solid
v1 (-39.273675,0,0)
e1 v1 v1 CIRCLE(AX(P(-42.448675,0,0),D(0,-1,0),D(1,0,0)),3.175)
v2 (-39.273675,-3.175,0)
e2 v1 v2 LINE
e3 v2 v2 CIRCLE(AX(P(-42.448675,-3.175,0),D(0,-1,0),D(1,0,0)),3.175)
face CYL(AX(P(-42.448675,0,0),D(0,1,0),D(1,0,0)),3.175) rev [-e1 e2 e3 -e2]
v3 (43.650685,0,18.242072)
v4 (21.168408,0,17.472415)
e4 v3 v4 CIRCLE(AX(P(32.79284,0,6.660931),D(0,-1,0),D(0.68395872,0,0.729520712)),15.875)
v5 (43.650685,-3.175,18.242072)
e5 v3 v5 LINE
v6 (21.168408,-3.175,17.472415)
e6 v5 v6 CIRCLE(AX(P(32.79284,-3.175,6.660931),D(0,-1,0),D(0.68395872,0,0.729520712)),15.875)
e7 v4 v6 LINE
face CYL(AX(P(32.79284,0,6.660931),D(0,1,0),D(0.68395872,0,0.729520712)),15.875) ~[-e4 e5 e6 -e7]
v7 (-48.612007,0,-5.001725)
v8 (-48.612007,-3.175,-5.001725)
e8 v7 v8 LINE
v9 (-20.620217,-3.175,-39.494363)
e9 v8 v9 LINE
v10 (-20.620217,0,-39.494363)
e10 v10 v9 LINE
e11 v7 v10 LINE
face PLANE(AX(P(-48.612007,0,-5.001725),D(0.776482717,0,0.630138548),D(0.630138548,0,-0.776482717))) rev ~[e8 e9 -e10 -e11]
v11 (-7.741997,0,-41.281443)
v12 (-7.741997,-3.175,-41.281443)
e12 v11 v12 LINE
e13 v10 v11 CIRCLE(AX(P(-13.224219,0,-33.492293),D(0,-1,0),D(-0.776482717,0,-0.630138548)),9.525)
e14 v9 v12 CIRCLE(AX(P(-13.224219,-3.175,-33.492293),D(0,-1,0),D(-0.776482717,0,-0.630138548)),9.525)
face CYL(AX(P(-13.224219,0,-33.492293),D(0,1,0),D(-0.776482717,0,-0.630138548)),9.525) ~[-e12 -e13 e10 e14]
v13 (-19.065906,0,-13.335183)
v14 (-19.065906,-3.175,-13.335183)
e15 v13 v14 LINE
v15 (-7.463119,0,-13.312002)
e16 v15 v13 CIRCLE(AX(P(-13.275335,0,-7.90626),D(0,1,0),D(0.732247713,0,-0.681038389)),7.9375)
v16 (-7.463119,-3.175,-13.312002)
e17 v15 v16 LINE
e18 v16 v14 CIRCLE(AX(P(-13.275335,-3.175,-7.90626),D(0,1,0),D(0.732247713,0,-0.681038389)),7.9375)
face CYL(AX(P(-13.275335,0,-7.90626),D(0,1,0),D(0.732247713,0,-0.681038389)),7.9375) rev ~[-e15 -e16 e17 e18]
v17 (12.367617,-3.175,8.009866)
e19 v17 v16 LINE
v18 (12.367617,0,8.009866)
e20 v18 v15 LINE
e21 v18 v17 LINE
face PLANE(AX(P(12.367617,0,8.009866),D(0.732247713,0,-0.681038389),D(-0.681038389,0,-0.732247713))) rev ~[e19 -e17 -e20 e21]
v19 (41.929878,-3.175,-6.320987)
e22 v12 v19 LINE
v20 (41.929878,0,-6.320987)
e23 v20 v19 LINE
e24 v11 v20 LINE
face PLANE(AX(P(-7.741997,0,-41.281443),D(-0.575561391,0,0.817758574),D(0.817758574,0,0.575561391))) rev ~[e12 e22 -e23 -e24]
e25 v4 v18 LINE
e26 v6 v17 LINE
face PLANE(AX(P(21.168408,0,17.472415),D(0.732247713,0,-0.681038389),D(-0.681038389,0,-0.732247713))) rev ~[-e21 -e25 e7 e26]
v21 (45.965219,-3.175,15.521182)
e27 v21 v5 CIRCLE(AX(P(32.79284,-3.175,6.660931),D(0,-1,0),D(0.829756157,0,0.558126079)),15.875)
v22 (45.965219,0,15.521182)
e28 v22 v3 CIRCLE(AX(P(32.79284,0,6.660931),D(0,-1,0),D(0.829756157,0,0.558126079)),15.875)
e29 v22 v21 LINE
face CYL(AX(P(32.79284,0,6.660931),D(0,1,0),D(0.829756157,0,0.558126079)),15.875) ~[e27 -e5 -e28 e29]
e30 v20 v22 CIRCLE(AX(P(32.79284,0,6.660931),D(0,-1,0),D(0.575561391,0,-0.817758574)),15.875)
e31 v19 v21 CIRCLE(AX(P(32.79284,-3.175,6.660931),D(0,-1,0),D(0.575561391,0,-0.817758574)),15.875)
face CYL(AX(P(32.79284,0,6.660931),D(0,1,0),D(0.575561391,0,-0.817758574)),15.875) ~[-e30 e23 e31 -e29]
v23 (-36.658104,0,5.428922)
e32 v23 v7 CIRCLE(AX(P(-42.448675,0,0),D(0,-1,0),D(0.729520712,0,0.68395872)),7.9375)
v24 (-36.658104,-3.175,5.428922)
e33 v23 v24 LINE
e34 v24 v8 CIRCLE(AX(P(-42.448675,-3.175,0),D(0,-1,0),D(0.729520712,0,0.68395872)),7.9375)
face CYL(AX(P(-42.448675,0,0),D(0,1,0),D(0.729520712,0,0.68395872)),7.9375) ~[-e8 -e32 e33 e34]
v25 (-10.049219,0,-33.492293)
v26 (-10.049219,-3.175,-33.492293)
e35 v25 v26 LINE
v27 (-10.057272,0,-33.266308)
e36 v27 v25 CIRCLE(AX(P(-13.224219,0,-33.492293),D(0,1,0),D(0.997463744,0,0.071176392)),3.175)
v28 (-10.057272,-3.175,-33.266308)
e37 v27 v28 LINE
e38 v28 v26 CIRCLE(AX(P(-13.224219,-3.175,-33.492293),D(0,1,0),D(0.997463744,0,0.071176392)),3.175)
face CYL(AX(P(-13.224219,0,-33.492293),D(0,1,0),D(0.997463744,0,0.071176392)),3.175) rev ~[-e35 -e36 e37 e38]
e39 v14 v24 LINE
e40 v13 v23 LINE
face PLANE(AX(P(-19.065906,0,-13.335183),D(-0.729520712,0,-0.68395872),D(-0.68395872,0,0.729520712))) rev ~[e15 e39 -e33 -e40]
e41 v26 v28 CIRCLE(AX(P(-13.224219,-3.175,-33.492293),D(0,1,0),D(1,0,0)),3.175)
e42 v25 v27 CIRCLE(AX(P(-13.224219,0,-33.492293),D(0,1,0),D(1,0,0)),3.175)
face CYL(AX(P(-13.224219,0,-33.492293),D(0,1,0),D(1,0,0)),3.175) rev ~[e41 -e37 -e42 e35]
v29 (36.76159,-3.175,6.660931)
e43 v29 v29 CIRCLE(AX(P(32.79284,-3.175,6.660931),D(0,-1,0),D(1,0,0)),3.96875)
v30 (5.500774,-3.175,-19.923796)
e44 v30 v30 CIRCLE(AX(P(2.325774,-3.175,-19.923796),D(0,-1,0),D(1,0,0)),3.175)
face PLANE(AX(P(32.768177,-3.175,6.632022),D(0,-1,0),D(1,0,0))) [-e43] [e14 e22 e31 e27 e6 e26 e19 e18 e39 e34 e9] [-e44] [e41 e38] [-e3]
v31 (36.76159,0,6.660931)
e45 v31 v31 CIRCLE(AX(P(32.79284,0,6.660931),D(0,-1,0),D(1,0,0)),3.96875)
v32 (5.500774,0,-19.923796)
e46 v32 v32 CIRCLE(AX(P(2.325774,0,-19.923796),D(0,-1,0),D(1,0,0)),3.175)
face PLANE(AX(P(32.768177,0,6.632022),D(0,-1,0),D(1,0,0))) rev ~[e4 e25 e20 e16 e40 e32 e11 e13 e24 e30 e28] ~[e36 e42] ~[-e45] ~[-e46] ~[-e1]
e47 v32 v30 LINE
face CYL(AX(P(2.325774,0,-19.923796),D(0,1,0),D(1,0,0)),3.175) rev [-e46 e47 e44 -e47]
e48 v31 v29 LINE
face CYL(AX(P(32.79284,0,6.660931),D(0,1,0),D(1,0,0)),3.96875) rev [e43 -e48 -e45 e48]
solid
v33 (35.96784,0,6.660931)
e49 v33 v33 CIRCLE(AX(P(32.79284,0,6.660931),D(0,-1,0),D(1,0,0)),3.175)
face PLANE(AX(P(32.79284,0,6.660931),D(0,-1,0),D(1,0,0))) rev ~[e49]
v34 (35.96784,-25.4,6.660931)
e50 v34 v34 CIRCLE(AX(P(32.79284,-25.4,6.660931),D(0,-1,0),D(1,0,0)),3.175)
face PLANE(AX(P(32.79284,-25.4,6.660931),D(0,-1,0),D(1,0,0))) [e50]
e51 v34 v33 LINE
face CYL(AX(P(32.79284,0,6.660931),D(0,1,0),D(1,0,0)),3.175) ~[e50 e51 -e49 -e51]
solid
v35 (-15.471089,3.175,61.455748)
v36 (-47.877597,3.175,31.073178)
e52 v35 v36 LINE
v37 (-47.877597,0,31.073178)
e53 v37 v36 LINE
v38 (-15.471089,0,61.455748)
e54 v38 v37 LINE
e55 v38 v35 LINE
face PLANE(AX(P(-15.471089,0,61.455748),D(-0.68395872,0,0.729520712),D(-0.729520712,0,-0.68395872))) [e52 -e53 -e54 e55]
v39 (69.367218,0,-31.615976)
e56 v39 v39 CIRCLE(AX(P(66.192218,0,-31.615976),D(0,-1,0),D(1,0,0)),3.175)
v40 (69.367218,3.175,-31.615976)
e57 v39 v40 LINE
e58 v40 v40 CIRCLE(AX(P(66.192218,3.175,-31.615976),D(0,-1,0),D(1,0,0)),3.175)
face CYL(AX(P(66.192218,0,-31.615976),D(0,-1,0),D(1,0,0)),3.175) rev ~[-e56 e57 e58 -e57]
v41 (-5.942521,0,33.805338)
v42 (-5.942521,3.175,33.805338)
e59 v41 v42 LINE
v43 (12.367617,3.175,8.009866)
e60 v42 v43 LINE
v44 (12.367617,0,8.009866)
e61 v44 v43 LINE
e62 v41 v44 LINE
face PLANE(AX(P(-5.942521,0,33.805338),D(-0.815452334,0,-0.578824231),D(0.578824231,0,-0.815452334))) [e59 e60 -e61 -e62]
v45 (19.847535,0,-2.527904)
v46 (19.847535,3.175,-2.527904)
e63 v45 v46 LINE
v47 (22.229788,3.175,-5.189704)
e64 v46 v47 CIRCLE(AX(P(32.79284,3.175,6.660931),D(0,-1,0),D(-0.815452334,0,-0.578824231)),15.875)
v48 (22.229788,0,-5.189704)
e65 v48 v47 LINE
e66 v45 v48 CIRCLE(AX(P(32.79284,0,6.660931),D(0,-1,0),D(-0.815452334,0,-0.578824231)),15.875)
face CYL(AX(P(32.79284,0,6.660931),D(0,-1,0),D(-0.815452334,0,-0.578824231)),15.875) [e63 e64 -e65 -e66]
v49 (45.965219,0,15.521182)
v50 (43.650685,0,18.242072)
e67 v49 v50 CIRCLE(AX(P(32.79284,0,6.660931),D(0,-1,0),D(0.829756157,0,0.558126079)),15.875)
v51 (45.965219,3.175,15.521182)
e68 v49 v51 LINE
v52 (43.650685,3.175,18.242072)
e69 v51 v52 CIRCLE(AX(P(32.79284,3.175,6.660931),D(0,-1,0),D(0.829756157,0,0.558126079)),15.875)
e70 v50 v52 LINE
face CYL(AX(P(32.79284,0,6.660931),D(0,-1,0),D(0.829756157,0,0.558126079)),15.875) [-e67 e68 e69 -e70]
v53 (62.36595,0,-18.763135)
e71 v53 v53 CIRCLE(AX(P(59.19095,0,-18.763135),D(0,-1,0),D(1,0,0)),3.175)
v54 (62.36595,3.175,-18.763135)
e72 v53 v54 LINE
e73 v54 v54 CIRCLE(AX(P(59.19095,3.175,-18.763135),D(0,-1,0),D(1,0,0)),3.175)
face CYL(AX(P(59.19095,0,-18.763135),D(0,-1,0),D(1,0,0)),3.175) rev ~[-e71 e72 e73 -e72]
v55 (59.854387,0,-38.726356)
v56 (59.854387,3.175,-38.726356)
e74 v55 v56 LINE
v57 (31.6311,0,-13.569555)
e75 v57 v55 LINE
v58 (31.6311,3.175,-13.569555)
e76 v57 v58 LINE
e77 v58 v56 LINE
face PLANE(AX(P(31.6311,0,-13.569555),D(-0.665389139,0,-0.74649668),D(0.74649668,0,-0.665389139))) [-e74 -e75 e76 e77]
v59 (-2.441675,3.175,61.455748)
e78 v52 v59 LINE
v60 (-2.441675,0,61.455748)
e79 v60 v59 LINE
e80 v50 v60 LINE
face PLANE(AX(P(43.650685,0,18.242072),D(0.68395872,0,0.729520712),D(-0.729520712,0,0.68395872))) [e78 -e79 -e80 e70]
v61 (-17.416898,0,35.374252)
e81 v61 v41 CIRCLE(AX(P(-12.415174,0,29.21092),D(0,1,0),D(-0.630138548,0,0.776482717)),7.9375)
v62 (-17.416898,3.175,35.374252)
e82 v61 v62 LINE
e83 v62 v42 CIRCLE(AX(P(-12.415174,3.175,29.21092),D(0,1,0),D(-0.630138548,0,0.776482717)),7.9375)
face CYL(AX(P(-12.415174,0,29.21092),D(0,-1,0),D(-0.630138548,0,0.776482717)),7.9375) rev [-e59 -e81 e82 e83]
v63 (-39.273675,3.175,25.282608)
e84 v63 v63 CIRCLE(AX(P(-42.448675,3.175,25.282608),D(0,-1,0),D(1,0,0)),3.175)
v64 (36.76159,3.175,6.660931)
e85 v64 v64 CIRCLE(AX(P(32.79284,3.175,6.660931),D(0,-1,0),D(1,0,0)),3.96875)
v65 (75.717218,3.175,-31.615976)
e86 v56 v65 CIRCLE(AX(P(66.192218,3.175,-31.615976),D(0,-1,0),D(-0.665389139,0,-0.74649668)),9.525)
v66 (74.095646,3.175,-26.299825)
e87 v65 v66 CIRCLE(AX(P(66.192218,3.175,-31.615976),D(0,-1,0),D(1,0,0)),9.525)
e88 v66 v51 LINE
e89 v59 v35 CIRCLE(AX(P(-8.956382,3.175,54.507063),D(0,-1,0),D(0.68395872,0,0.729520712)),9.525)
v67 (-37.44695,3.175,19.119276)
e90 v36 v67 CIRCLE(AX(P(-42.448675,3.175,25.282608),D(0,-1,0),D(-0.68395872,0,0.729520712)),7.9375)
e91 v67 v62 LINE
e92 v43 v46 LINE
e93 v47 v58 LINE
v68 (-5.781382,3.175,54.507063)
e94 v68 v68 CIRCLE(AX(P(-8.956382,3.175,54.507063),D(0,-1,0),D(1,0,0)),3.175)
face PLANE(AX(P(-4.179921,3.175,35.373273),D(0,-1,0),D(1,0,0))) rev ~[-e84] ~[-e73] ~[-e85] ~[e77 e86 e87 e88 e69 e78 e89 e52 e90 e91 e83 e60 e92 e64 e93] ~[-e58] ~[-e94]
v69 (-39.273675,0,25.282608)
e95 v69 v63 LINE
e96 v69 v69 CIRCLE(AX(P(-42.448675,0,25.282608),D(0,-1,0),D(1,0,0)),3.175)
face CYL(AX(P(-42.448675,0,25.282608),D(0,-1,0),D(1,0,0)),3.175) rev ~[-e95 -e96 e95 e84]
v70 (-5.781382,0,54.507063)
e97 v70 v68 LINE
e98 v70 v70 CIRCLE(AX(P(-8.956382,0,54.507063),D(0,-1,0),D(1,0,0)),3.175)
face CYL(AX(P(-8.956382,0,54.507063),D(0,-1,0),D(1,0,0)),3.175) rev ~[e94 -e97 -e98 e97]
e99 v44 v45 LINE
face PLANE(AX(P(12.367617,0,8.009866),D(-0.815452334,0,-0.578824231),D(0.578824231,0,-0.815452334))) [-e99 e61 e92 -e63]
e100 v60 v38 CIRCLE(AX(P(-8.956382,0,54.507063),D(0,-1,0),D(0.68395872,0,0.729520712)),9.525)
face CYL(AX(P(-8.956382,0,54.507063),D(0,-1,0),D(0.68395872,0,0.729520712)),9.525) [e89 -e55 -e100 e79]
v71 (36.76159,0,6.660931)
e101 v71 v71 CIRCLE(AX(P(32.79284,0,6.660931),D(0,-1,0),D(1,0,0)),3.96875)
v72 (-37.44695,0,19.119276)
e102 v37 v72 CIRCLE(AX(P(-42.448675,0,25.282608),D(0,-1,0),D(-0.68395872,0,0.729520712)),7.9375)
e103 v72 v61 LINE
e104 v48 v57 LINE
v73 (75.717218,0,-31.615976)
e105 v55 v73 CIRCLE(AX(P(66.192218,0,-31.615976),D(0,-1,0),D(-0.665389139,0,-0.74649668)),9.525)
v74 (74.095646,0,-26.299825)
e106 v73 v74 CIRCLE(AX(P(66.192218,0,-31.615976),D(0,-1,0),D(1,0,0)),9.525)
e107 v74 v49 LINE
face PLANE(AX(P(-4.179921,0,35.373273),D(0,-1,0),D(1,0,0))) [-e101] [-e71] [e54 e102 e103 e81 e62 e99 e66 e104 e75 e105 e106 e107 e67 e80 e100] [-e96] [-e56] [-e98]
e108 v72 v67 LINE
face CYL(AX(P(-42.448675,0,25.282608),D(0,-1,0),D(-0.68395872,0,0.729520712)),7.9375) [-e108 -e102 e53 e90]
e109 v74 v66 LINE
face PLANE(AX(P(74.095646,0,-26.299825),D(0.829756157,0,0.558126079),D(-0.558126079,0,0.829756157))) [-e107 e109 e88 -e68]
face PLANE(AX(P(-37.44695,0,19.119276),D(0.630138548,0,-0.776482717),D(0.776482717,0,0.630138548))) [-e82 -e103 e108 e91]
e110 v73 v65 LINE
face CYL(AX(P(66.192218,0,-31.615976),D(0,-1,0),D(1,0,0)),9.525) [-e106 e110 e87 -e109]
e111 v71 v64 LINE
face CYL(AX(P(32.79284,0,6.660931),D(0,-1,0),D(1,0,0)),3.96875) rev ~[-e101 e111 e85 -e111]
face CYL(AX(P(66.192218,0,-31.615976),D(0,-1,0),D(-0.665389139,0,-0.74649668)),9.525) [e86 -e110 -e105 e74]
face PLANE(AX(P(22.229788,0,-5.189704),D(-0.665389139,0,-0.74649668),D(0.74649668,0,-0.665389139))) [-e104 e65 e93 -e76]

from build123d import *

# Parameters (mm, degrees)
F0_R     = 3.175
F0_R_2   = 3.96875
F1_DEPTH = 3.175
F2_DEPTH = 3.175
F3_DEPTH = 25.4


# Not quite as in the source:
# - a feature names something its author has since deleted; it is built from what else it names


with BuildPart() as f1:
    # F0 (on Front) → F1 (new body)
    with BuildSketch(Plane.XZ):
        with BuildLine():
            ThreePointArc((21.168407994, 17.4724150988), (32.2496948497, 22.5266363925), (43.6506851161, 18.2420719796))
            Line((43.6506851161, 18.2420719796), (-2.4416753004, 61.4557481855))
            ThreePointArc((-2.4416753004, 61.4557481855), (-0.2162960867, 58.2934233078), (0.5686178911, 54.5070634035))
            ThreePointArc((0.5686178911, 54.5070634035), (-12.7427420132, 45.7669773813), (-15.4710889174, 61.4557481855))
            Line((-15.4710889174, 61.4557481855), (-47.8775973584, 31.0731782742))
            ThreePointArc((-47.8775973584, 31.0731782742), (-39.2933750978, 32.5660126411), (-34.511175018, 25.2826076226))
            ThreePointArc((-34.511175018, 25.2826076226), (-35.2826057932, 21.8691990453), (-37.4469502912, 19.1192760553))
            Line((-37.4469502912, 19.1192760553), (-17.4168982381, 35.3742520435))
            ThreePointArc((-17.4168982381, 35.3742520435), (-11.3398687202, 37.0752466303), (-5.9425206073, 33.8053378098))
            Line((-5.9425206073, 33.8053378098), (12.3676167081, 8.0098658563))
            Line((12.3676167081, 8.0098658563), (21.168407994, 17.4724150988))
        make_face()
        with BuildLine():
            ThreePointArc((0.5686178911, 54.5070634035), (-0.2162960867, 58.2934233078), (-2.4416753004, 61.4557481855))
            ThreePointArc((-2.4416753004, 61.4557481855), (-8.9563821089, 64.0320634035), (-15.4710889174, 61.4557481855))
            ThreePointArc((-15.4710889174, 61.4557481855), (-12.7427420132, 45.7669773813), (0.5686178911, 54.5070634035))
        make_face()
        with Locations((-8.9563821089, 54.5070634035)):
            Circle(F0_R, mode=Mode.SUBTRACT)
        with BuildLine():
            ThreePointArc((-34.511175018, 25.2826076226), (-39.2933750978, 32.5660126411), (-47.8775973584, 31.0731782742))
            ThreePointArc((-47.8775973584, 31.0731782742), (-48.4294416089, 20.0639548045), (-37.4469502912, 19.1192760553))
            ThreePointArc((-37.4469502912, 19.1192760553), (-35.2826057932, 21.8691990453), (-34.511175018, 25.2826076226))
        make_face()
        with Locations((-42.448675018, 25.2826076226)):
            Circle(F0_R, mode=Mode.SUBTRACT)
        with BuildLine():
            ThreePointArc((48.6678404353, 6.6609306763), (47.9771603326, 11.292566916), (45.9652194266, 15.52118218))
            ThreePointArc((45.9652194266, 15.52118218), (44.8847270854, 16.9469358407), (43.6506851161, 18.2420719796))
            ThreePointArc((43.6506851161, 18.2420719796), (32.2496948497, 22.5266363925), (21.168407994, 17.4724150988))
            ThreePointArc((21.168407994, 17.4724150988), (16.9523480083, 7.7070782137), (19.8475346273, -2.5279039906))
            ThreePointArc((19.8475346273, -2.5279039906), (20.9635537477, -3.926023629), (22.229787853, -5.1897041229))
            ThreePointArc((22.229787853, -5.1897041229), (31.8827140076, -9.1879587134), (41.9298775136, -6.3209866871))
            ThreePointArc((41.9298775136, -6.3209866871), (46.8830158887, -0.6522478865), (48.6678404353, 6.6609306763))
        make_face()
        with Locations((32.7928404353, 6.6609306763)):
            Circle(F0_R_2, mode=Mode.SUBTRACT)
        with BuildLine():
            ThreePointArc((59.8543869213, -38.726356385), (59.9298350891, -24.4390555964), (74.0956458655, -26.2998246032))
            Line((74.0956458655, -26.2998246032), (45.9652194266, 15.52118218))
            ThreePointArc((45.9652194266, 15.52118218), (47.9771603326, 11.292566916), (48.6678404353, 6.6609306763))
            ThreePointArc((48.6678404353, 6.6609306763), (46.8830158887, -0.6522478865), (41.9298775136, -6.3209866871))
            Line((41.9298775136, -6.3209866871), (31.63109975, -13.5695549573))
            Line((31.63109975, -13.5695549573), (59.8543869213, -38.726356385))
        make_face()
        with Locations((59.1909500346, -18.7631345147)):
            Circle(F0_R, mode=Mode.SUBTRACT)
        with BuildLine():
            Line((22.229787853, -5.1897041229), (31.63109975, -13.5695549573))
            Line((31.63109975, -13.5695549573), (41.9298775136, -6.3209866871))
            ThreePointArc((41.9298775136, -6.3209866871), (31.8827140076, -9.1879587134), (22.229787853, -5.1897041229))
        make_face()
        with BuildLine():
            ThreePointArc((19.8475346273, -2.5279039906), (16.9523480083, 7.7070782137), (21.168407994, 17.4724150988))
            Line((21.168407994, 17.4724150988), (12.3676167081, 8.0098658563))
            Line((12.3676167081, 8.0098658563), (19.8475346273, -2.5279039906))
        make_face()
        with BuildLine():
            ThreePointArc((59.8543869213, -38.726356385), (70.088227935, -40.3077379996), (75.7172184707, -31.6159755055))
            ThreePointArc((75.7172184707, -31.6159755055), (75.3028104091, -28.8369937617), (74.0956458655, -26.2998246032))
            ThreePointArc((74.0956458655, -26.2998246032), (59.9298350891, -24.4390555964), (59.8543869213, -38.726356385))
        make_face()
        with Locations((66.1922184707, -31.6159755055)):
            Circle(F0_R, mode=Mode.SUBTRACT)
    extrude(amount=-F1_DEPTH)


with BuildPart() as f2:
    # F0 (on Front) → F2 (new body)
    with BuildSketch(Plane.XZ):
        with Locations((32.7928404353, 6.6609306763)):
            Circle(F0_R)
    extrude(amount=F2_DEPTH)

    # F0 (on Front) → F3 (join)
    with BuildSketch(Plane.XZ):
        with Locations((32.7928404353, 6.6609306763)):
            Circle(F0_R)
    extrude(amount=F3_DEPTH)


with BuildPart() as f2b:
    # F0 (on Front) → F2, piece 2 (new body)
    with BuildSketch(Plane.XZ):
        with BuildLine():
            ThreePointArc((48.6678404353, 6.6609306763), (47.9771603326, 11.292566916), (45.9652194266, 15.52118218))
            ThreePointArc((45.9652194266, 15.52118218), (44.8847270854, 16.9469358407), (43.6506851161, 18.2420719796))
            ThreePointArc((43.6506851161, 18.2420719796), (32.2496948497, 22.5266363925), (21.168407994, 17.4724150988))
            ThreePointArc((21.168407994, 17.4724150988), (16.9523480083, 7.7070782137), (19.8475346273, -2.5279039906))
            ThreePointArc((19.8475346273, -2.5279039906), (20.9635537477, -3.926023629), (22.229787853, -5.1897041229))
            ThreePointArc((22.229787853, -5.1897041229), (31.8827140076, -9.1879587134), (41.9298775136, -6.3209866871))
            ThreePointArc((41.9298775136, -6.3209866871), (46.8830158887, -0.6522478865), (48.6678404353, 6.6609306763))
        make_face()
        with Locations((32.7928404353, 6.6609306763)):
            Circle(F0_R_2, mode=Mode.SUBTRACT)
        with BuildLine():
            Line((-7.7419969901, -41.2814433271), (31.63109975, -13.5695549573))
            Line((31.63109975, -13.5695549573), (22.229787853, -5.1897041229))
            ThreePointArc((22.229787853, -5.1897041229), (20.9635537477, -3.926023629), (19.8475346273, -2.5279039906))
            Line((19.8475346273, -2.5279039906), (12.3676167081, 8.0098658563))
            Line((12.3676167081, 8.0098658563), (-7.4631189723, -13.3120024615))
            ThreePointArc((-7.4631189723, -13.3120024615), (-13.2594776313, -15.8437444101), (-19.0659058445, -13.3351825907))
            Line((-19.0659058445, -13.3351825907), (-36.6581043663, 5.4289223404))
            ThreePointArc((-36.6581043663, 5.4289223404), (-35.067395969, 2.9190111085), (-34.511175018, 0))
            ThreePointArc((-34.511175018, 0), (-39.7951432267, -7.4808204953), (-48.6120065852, -5.0017247268))
            Line((-48.6120065852, -5.0017247268), (-20.6202171177, -39.4943625812))
            ThreePointArc((-20.6202171177, -39.4943625812), (-20.0372197924, -26.8358187348), (-7.3956423811, -25.9588131796))
            ThreePointArc((-7.3956423811, -25.9588131796), (-4.6731134737, -29.2965551642), (-3.699219237, -33.4922929091))
            ThreePointArc((-3.699219237, -33.4922929091), (-4.3961637904, -37.0687523357), (-6.3850065401, -40.1218324621))
            ThreePointArc((-6.3850065401, -40.1218324621), (-7.0362782136, -40.7334952188), (-7.7419969901, -41.2814433271))
        make_face()
        with Locations((2.3257738993, -19.9237955822)):
            Circle(F0_R, mode=Mode.SUBTRACT)
        with BuildLine():
            Line((22.229787853, -5.1897041229), (31.63109975, -13.5695549573))
            Line((31.63109975, -13.5695549573), (41.9298775136, -6.3209866871))
            ThreePointArc((41.9298775136, -6.3209866871), (31.8827140076, -9.1879587134), (22.229787853, -5.1897041229))
        make_face()
        with BuildLine():
            ThreePointArc((-20.6202171177, -39.4943625812), (-14.533436061, -42.9268875643), (-7.7419969901, -41.2814433271))
            ThreePointArc((-7.7419969901, -41.2814433271), (-7.0362782136, -40.7334952188), (-6.3850065401, -40.1218324621))
            Line((-6.3850065401, -40.1218324621), (-6.8903244606, -33.0403228209))
            Line((-6.8903244606, -33.0403228209), (-7.3956423811, -25.9588131796))
            ThreePointArc((-7.3956423811, -25.9588131796), (-20.0372197924, -26.8358187348), (-20.6202171177, -39.4943625812))
        make_face()
        with BuildLine():
            ThreePointArc((-10.049219237, -33.4922929091), (-16.3972054455, -33.6053571438), (-10.0572718488, -33.266307865))
            ThreePointArc((-10.0572718488, -33.266307865), (-10.0512330286, -33.3792286743), (-10.049219237, -33.4922929091))
        make_face(mode=Mode.SUBTRACT)
        with BuildLine():
            ThreePointArc((19.8475346273, -2.5279039906), (16.9523480083, 7.7070782137), (21.168407994, 17.4724150988))
            Line((21.168407994, 17.4724150988), (12.3676167081, 8.0098658563))
            Line((12.3676167081, 8.0098658563), (19.8475346273, -2.5279039906))
        make_face()
        with BuildLine():
            Line((-6.8903244606, -33.0403228209), (-6.3850065401, -40.1218324621))
            ThreePointArc((-6.3850065401, -40.1218324621), (-4.3961637904, -37.0687523357), (-3.699219237, -33.4922929091))
            ThreePointArc((-3.699219237, -33.4922929091), (-4.6731134737, -29.2965551642), (-7.3956423811, -25.9588131796))
            Line((-7.3956423811, -25.9588131796), (-6.8903244606, -33.0403228209))
        make_face()
        with BuildLine():
            ThreePointArc((-36.6581043663, 5.4289223404), (-47.667327836, 5.9807665909), (-48.6120065852, -5.0017247268))
            ThreePointArc((-48.6120065852, -5.0017247268), (-39.7951432267, -7.4808204953), (-34.511175018, 0))
            ThreePointArc((-34.511175018, 0), (-35.067395969, 2.9190111085), (-36.6581043663, 5.4289223404))
        make_face()
        with Locations((-42.448675018, 0)):
            Circle(F0_R, mode=Mode.SUBTRACT)
    extrude(amount=F2_DEPTH)


solid = Compound([f1.part, f2.part, f2b.part])
